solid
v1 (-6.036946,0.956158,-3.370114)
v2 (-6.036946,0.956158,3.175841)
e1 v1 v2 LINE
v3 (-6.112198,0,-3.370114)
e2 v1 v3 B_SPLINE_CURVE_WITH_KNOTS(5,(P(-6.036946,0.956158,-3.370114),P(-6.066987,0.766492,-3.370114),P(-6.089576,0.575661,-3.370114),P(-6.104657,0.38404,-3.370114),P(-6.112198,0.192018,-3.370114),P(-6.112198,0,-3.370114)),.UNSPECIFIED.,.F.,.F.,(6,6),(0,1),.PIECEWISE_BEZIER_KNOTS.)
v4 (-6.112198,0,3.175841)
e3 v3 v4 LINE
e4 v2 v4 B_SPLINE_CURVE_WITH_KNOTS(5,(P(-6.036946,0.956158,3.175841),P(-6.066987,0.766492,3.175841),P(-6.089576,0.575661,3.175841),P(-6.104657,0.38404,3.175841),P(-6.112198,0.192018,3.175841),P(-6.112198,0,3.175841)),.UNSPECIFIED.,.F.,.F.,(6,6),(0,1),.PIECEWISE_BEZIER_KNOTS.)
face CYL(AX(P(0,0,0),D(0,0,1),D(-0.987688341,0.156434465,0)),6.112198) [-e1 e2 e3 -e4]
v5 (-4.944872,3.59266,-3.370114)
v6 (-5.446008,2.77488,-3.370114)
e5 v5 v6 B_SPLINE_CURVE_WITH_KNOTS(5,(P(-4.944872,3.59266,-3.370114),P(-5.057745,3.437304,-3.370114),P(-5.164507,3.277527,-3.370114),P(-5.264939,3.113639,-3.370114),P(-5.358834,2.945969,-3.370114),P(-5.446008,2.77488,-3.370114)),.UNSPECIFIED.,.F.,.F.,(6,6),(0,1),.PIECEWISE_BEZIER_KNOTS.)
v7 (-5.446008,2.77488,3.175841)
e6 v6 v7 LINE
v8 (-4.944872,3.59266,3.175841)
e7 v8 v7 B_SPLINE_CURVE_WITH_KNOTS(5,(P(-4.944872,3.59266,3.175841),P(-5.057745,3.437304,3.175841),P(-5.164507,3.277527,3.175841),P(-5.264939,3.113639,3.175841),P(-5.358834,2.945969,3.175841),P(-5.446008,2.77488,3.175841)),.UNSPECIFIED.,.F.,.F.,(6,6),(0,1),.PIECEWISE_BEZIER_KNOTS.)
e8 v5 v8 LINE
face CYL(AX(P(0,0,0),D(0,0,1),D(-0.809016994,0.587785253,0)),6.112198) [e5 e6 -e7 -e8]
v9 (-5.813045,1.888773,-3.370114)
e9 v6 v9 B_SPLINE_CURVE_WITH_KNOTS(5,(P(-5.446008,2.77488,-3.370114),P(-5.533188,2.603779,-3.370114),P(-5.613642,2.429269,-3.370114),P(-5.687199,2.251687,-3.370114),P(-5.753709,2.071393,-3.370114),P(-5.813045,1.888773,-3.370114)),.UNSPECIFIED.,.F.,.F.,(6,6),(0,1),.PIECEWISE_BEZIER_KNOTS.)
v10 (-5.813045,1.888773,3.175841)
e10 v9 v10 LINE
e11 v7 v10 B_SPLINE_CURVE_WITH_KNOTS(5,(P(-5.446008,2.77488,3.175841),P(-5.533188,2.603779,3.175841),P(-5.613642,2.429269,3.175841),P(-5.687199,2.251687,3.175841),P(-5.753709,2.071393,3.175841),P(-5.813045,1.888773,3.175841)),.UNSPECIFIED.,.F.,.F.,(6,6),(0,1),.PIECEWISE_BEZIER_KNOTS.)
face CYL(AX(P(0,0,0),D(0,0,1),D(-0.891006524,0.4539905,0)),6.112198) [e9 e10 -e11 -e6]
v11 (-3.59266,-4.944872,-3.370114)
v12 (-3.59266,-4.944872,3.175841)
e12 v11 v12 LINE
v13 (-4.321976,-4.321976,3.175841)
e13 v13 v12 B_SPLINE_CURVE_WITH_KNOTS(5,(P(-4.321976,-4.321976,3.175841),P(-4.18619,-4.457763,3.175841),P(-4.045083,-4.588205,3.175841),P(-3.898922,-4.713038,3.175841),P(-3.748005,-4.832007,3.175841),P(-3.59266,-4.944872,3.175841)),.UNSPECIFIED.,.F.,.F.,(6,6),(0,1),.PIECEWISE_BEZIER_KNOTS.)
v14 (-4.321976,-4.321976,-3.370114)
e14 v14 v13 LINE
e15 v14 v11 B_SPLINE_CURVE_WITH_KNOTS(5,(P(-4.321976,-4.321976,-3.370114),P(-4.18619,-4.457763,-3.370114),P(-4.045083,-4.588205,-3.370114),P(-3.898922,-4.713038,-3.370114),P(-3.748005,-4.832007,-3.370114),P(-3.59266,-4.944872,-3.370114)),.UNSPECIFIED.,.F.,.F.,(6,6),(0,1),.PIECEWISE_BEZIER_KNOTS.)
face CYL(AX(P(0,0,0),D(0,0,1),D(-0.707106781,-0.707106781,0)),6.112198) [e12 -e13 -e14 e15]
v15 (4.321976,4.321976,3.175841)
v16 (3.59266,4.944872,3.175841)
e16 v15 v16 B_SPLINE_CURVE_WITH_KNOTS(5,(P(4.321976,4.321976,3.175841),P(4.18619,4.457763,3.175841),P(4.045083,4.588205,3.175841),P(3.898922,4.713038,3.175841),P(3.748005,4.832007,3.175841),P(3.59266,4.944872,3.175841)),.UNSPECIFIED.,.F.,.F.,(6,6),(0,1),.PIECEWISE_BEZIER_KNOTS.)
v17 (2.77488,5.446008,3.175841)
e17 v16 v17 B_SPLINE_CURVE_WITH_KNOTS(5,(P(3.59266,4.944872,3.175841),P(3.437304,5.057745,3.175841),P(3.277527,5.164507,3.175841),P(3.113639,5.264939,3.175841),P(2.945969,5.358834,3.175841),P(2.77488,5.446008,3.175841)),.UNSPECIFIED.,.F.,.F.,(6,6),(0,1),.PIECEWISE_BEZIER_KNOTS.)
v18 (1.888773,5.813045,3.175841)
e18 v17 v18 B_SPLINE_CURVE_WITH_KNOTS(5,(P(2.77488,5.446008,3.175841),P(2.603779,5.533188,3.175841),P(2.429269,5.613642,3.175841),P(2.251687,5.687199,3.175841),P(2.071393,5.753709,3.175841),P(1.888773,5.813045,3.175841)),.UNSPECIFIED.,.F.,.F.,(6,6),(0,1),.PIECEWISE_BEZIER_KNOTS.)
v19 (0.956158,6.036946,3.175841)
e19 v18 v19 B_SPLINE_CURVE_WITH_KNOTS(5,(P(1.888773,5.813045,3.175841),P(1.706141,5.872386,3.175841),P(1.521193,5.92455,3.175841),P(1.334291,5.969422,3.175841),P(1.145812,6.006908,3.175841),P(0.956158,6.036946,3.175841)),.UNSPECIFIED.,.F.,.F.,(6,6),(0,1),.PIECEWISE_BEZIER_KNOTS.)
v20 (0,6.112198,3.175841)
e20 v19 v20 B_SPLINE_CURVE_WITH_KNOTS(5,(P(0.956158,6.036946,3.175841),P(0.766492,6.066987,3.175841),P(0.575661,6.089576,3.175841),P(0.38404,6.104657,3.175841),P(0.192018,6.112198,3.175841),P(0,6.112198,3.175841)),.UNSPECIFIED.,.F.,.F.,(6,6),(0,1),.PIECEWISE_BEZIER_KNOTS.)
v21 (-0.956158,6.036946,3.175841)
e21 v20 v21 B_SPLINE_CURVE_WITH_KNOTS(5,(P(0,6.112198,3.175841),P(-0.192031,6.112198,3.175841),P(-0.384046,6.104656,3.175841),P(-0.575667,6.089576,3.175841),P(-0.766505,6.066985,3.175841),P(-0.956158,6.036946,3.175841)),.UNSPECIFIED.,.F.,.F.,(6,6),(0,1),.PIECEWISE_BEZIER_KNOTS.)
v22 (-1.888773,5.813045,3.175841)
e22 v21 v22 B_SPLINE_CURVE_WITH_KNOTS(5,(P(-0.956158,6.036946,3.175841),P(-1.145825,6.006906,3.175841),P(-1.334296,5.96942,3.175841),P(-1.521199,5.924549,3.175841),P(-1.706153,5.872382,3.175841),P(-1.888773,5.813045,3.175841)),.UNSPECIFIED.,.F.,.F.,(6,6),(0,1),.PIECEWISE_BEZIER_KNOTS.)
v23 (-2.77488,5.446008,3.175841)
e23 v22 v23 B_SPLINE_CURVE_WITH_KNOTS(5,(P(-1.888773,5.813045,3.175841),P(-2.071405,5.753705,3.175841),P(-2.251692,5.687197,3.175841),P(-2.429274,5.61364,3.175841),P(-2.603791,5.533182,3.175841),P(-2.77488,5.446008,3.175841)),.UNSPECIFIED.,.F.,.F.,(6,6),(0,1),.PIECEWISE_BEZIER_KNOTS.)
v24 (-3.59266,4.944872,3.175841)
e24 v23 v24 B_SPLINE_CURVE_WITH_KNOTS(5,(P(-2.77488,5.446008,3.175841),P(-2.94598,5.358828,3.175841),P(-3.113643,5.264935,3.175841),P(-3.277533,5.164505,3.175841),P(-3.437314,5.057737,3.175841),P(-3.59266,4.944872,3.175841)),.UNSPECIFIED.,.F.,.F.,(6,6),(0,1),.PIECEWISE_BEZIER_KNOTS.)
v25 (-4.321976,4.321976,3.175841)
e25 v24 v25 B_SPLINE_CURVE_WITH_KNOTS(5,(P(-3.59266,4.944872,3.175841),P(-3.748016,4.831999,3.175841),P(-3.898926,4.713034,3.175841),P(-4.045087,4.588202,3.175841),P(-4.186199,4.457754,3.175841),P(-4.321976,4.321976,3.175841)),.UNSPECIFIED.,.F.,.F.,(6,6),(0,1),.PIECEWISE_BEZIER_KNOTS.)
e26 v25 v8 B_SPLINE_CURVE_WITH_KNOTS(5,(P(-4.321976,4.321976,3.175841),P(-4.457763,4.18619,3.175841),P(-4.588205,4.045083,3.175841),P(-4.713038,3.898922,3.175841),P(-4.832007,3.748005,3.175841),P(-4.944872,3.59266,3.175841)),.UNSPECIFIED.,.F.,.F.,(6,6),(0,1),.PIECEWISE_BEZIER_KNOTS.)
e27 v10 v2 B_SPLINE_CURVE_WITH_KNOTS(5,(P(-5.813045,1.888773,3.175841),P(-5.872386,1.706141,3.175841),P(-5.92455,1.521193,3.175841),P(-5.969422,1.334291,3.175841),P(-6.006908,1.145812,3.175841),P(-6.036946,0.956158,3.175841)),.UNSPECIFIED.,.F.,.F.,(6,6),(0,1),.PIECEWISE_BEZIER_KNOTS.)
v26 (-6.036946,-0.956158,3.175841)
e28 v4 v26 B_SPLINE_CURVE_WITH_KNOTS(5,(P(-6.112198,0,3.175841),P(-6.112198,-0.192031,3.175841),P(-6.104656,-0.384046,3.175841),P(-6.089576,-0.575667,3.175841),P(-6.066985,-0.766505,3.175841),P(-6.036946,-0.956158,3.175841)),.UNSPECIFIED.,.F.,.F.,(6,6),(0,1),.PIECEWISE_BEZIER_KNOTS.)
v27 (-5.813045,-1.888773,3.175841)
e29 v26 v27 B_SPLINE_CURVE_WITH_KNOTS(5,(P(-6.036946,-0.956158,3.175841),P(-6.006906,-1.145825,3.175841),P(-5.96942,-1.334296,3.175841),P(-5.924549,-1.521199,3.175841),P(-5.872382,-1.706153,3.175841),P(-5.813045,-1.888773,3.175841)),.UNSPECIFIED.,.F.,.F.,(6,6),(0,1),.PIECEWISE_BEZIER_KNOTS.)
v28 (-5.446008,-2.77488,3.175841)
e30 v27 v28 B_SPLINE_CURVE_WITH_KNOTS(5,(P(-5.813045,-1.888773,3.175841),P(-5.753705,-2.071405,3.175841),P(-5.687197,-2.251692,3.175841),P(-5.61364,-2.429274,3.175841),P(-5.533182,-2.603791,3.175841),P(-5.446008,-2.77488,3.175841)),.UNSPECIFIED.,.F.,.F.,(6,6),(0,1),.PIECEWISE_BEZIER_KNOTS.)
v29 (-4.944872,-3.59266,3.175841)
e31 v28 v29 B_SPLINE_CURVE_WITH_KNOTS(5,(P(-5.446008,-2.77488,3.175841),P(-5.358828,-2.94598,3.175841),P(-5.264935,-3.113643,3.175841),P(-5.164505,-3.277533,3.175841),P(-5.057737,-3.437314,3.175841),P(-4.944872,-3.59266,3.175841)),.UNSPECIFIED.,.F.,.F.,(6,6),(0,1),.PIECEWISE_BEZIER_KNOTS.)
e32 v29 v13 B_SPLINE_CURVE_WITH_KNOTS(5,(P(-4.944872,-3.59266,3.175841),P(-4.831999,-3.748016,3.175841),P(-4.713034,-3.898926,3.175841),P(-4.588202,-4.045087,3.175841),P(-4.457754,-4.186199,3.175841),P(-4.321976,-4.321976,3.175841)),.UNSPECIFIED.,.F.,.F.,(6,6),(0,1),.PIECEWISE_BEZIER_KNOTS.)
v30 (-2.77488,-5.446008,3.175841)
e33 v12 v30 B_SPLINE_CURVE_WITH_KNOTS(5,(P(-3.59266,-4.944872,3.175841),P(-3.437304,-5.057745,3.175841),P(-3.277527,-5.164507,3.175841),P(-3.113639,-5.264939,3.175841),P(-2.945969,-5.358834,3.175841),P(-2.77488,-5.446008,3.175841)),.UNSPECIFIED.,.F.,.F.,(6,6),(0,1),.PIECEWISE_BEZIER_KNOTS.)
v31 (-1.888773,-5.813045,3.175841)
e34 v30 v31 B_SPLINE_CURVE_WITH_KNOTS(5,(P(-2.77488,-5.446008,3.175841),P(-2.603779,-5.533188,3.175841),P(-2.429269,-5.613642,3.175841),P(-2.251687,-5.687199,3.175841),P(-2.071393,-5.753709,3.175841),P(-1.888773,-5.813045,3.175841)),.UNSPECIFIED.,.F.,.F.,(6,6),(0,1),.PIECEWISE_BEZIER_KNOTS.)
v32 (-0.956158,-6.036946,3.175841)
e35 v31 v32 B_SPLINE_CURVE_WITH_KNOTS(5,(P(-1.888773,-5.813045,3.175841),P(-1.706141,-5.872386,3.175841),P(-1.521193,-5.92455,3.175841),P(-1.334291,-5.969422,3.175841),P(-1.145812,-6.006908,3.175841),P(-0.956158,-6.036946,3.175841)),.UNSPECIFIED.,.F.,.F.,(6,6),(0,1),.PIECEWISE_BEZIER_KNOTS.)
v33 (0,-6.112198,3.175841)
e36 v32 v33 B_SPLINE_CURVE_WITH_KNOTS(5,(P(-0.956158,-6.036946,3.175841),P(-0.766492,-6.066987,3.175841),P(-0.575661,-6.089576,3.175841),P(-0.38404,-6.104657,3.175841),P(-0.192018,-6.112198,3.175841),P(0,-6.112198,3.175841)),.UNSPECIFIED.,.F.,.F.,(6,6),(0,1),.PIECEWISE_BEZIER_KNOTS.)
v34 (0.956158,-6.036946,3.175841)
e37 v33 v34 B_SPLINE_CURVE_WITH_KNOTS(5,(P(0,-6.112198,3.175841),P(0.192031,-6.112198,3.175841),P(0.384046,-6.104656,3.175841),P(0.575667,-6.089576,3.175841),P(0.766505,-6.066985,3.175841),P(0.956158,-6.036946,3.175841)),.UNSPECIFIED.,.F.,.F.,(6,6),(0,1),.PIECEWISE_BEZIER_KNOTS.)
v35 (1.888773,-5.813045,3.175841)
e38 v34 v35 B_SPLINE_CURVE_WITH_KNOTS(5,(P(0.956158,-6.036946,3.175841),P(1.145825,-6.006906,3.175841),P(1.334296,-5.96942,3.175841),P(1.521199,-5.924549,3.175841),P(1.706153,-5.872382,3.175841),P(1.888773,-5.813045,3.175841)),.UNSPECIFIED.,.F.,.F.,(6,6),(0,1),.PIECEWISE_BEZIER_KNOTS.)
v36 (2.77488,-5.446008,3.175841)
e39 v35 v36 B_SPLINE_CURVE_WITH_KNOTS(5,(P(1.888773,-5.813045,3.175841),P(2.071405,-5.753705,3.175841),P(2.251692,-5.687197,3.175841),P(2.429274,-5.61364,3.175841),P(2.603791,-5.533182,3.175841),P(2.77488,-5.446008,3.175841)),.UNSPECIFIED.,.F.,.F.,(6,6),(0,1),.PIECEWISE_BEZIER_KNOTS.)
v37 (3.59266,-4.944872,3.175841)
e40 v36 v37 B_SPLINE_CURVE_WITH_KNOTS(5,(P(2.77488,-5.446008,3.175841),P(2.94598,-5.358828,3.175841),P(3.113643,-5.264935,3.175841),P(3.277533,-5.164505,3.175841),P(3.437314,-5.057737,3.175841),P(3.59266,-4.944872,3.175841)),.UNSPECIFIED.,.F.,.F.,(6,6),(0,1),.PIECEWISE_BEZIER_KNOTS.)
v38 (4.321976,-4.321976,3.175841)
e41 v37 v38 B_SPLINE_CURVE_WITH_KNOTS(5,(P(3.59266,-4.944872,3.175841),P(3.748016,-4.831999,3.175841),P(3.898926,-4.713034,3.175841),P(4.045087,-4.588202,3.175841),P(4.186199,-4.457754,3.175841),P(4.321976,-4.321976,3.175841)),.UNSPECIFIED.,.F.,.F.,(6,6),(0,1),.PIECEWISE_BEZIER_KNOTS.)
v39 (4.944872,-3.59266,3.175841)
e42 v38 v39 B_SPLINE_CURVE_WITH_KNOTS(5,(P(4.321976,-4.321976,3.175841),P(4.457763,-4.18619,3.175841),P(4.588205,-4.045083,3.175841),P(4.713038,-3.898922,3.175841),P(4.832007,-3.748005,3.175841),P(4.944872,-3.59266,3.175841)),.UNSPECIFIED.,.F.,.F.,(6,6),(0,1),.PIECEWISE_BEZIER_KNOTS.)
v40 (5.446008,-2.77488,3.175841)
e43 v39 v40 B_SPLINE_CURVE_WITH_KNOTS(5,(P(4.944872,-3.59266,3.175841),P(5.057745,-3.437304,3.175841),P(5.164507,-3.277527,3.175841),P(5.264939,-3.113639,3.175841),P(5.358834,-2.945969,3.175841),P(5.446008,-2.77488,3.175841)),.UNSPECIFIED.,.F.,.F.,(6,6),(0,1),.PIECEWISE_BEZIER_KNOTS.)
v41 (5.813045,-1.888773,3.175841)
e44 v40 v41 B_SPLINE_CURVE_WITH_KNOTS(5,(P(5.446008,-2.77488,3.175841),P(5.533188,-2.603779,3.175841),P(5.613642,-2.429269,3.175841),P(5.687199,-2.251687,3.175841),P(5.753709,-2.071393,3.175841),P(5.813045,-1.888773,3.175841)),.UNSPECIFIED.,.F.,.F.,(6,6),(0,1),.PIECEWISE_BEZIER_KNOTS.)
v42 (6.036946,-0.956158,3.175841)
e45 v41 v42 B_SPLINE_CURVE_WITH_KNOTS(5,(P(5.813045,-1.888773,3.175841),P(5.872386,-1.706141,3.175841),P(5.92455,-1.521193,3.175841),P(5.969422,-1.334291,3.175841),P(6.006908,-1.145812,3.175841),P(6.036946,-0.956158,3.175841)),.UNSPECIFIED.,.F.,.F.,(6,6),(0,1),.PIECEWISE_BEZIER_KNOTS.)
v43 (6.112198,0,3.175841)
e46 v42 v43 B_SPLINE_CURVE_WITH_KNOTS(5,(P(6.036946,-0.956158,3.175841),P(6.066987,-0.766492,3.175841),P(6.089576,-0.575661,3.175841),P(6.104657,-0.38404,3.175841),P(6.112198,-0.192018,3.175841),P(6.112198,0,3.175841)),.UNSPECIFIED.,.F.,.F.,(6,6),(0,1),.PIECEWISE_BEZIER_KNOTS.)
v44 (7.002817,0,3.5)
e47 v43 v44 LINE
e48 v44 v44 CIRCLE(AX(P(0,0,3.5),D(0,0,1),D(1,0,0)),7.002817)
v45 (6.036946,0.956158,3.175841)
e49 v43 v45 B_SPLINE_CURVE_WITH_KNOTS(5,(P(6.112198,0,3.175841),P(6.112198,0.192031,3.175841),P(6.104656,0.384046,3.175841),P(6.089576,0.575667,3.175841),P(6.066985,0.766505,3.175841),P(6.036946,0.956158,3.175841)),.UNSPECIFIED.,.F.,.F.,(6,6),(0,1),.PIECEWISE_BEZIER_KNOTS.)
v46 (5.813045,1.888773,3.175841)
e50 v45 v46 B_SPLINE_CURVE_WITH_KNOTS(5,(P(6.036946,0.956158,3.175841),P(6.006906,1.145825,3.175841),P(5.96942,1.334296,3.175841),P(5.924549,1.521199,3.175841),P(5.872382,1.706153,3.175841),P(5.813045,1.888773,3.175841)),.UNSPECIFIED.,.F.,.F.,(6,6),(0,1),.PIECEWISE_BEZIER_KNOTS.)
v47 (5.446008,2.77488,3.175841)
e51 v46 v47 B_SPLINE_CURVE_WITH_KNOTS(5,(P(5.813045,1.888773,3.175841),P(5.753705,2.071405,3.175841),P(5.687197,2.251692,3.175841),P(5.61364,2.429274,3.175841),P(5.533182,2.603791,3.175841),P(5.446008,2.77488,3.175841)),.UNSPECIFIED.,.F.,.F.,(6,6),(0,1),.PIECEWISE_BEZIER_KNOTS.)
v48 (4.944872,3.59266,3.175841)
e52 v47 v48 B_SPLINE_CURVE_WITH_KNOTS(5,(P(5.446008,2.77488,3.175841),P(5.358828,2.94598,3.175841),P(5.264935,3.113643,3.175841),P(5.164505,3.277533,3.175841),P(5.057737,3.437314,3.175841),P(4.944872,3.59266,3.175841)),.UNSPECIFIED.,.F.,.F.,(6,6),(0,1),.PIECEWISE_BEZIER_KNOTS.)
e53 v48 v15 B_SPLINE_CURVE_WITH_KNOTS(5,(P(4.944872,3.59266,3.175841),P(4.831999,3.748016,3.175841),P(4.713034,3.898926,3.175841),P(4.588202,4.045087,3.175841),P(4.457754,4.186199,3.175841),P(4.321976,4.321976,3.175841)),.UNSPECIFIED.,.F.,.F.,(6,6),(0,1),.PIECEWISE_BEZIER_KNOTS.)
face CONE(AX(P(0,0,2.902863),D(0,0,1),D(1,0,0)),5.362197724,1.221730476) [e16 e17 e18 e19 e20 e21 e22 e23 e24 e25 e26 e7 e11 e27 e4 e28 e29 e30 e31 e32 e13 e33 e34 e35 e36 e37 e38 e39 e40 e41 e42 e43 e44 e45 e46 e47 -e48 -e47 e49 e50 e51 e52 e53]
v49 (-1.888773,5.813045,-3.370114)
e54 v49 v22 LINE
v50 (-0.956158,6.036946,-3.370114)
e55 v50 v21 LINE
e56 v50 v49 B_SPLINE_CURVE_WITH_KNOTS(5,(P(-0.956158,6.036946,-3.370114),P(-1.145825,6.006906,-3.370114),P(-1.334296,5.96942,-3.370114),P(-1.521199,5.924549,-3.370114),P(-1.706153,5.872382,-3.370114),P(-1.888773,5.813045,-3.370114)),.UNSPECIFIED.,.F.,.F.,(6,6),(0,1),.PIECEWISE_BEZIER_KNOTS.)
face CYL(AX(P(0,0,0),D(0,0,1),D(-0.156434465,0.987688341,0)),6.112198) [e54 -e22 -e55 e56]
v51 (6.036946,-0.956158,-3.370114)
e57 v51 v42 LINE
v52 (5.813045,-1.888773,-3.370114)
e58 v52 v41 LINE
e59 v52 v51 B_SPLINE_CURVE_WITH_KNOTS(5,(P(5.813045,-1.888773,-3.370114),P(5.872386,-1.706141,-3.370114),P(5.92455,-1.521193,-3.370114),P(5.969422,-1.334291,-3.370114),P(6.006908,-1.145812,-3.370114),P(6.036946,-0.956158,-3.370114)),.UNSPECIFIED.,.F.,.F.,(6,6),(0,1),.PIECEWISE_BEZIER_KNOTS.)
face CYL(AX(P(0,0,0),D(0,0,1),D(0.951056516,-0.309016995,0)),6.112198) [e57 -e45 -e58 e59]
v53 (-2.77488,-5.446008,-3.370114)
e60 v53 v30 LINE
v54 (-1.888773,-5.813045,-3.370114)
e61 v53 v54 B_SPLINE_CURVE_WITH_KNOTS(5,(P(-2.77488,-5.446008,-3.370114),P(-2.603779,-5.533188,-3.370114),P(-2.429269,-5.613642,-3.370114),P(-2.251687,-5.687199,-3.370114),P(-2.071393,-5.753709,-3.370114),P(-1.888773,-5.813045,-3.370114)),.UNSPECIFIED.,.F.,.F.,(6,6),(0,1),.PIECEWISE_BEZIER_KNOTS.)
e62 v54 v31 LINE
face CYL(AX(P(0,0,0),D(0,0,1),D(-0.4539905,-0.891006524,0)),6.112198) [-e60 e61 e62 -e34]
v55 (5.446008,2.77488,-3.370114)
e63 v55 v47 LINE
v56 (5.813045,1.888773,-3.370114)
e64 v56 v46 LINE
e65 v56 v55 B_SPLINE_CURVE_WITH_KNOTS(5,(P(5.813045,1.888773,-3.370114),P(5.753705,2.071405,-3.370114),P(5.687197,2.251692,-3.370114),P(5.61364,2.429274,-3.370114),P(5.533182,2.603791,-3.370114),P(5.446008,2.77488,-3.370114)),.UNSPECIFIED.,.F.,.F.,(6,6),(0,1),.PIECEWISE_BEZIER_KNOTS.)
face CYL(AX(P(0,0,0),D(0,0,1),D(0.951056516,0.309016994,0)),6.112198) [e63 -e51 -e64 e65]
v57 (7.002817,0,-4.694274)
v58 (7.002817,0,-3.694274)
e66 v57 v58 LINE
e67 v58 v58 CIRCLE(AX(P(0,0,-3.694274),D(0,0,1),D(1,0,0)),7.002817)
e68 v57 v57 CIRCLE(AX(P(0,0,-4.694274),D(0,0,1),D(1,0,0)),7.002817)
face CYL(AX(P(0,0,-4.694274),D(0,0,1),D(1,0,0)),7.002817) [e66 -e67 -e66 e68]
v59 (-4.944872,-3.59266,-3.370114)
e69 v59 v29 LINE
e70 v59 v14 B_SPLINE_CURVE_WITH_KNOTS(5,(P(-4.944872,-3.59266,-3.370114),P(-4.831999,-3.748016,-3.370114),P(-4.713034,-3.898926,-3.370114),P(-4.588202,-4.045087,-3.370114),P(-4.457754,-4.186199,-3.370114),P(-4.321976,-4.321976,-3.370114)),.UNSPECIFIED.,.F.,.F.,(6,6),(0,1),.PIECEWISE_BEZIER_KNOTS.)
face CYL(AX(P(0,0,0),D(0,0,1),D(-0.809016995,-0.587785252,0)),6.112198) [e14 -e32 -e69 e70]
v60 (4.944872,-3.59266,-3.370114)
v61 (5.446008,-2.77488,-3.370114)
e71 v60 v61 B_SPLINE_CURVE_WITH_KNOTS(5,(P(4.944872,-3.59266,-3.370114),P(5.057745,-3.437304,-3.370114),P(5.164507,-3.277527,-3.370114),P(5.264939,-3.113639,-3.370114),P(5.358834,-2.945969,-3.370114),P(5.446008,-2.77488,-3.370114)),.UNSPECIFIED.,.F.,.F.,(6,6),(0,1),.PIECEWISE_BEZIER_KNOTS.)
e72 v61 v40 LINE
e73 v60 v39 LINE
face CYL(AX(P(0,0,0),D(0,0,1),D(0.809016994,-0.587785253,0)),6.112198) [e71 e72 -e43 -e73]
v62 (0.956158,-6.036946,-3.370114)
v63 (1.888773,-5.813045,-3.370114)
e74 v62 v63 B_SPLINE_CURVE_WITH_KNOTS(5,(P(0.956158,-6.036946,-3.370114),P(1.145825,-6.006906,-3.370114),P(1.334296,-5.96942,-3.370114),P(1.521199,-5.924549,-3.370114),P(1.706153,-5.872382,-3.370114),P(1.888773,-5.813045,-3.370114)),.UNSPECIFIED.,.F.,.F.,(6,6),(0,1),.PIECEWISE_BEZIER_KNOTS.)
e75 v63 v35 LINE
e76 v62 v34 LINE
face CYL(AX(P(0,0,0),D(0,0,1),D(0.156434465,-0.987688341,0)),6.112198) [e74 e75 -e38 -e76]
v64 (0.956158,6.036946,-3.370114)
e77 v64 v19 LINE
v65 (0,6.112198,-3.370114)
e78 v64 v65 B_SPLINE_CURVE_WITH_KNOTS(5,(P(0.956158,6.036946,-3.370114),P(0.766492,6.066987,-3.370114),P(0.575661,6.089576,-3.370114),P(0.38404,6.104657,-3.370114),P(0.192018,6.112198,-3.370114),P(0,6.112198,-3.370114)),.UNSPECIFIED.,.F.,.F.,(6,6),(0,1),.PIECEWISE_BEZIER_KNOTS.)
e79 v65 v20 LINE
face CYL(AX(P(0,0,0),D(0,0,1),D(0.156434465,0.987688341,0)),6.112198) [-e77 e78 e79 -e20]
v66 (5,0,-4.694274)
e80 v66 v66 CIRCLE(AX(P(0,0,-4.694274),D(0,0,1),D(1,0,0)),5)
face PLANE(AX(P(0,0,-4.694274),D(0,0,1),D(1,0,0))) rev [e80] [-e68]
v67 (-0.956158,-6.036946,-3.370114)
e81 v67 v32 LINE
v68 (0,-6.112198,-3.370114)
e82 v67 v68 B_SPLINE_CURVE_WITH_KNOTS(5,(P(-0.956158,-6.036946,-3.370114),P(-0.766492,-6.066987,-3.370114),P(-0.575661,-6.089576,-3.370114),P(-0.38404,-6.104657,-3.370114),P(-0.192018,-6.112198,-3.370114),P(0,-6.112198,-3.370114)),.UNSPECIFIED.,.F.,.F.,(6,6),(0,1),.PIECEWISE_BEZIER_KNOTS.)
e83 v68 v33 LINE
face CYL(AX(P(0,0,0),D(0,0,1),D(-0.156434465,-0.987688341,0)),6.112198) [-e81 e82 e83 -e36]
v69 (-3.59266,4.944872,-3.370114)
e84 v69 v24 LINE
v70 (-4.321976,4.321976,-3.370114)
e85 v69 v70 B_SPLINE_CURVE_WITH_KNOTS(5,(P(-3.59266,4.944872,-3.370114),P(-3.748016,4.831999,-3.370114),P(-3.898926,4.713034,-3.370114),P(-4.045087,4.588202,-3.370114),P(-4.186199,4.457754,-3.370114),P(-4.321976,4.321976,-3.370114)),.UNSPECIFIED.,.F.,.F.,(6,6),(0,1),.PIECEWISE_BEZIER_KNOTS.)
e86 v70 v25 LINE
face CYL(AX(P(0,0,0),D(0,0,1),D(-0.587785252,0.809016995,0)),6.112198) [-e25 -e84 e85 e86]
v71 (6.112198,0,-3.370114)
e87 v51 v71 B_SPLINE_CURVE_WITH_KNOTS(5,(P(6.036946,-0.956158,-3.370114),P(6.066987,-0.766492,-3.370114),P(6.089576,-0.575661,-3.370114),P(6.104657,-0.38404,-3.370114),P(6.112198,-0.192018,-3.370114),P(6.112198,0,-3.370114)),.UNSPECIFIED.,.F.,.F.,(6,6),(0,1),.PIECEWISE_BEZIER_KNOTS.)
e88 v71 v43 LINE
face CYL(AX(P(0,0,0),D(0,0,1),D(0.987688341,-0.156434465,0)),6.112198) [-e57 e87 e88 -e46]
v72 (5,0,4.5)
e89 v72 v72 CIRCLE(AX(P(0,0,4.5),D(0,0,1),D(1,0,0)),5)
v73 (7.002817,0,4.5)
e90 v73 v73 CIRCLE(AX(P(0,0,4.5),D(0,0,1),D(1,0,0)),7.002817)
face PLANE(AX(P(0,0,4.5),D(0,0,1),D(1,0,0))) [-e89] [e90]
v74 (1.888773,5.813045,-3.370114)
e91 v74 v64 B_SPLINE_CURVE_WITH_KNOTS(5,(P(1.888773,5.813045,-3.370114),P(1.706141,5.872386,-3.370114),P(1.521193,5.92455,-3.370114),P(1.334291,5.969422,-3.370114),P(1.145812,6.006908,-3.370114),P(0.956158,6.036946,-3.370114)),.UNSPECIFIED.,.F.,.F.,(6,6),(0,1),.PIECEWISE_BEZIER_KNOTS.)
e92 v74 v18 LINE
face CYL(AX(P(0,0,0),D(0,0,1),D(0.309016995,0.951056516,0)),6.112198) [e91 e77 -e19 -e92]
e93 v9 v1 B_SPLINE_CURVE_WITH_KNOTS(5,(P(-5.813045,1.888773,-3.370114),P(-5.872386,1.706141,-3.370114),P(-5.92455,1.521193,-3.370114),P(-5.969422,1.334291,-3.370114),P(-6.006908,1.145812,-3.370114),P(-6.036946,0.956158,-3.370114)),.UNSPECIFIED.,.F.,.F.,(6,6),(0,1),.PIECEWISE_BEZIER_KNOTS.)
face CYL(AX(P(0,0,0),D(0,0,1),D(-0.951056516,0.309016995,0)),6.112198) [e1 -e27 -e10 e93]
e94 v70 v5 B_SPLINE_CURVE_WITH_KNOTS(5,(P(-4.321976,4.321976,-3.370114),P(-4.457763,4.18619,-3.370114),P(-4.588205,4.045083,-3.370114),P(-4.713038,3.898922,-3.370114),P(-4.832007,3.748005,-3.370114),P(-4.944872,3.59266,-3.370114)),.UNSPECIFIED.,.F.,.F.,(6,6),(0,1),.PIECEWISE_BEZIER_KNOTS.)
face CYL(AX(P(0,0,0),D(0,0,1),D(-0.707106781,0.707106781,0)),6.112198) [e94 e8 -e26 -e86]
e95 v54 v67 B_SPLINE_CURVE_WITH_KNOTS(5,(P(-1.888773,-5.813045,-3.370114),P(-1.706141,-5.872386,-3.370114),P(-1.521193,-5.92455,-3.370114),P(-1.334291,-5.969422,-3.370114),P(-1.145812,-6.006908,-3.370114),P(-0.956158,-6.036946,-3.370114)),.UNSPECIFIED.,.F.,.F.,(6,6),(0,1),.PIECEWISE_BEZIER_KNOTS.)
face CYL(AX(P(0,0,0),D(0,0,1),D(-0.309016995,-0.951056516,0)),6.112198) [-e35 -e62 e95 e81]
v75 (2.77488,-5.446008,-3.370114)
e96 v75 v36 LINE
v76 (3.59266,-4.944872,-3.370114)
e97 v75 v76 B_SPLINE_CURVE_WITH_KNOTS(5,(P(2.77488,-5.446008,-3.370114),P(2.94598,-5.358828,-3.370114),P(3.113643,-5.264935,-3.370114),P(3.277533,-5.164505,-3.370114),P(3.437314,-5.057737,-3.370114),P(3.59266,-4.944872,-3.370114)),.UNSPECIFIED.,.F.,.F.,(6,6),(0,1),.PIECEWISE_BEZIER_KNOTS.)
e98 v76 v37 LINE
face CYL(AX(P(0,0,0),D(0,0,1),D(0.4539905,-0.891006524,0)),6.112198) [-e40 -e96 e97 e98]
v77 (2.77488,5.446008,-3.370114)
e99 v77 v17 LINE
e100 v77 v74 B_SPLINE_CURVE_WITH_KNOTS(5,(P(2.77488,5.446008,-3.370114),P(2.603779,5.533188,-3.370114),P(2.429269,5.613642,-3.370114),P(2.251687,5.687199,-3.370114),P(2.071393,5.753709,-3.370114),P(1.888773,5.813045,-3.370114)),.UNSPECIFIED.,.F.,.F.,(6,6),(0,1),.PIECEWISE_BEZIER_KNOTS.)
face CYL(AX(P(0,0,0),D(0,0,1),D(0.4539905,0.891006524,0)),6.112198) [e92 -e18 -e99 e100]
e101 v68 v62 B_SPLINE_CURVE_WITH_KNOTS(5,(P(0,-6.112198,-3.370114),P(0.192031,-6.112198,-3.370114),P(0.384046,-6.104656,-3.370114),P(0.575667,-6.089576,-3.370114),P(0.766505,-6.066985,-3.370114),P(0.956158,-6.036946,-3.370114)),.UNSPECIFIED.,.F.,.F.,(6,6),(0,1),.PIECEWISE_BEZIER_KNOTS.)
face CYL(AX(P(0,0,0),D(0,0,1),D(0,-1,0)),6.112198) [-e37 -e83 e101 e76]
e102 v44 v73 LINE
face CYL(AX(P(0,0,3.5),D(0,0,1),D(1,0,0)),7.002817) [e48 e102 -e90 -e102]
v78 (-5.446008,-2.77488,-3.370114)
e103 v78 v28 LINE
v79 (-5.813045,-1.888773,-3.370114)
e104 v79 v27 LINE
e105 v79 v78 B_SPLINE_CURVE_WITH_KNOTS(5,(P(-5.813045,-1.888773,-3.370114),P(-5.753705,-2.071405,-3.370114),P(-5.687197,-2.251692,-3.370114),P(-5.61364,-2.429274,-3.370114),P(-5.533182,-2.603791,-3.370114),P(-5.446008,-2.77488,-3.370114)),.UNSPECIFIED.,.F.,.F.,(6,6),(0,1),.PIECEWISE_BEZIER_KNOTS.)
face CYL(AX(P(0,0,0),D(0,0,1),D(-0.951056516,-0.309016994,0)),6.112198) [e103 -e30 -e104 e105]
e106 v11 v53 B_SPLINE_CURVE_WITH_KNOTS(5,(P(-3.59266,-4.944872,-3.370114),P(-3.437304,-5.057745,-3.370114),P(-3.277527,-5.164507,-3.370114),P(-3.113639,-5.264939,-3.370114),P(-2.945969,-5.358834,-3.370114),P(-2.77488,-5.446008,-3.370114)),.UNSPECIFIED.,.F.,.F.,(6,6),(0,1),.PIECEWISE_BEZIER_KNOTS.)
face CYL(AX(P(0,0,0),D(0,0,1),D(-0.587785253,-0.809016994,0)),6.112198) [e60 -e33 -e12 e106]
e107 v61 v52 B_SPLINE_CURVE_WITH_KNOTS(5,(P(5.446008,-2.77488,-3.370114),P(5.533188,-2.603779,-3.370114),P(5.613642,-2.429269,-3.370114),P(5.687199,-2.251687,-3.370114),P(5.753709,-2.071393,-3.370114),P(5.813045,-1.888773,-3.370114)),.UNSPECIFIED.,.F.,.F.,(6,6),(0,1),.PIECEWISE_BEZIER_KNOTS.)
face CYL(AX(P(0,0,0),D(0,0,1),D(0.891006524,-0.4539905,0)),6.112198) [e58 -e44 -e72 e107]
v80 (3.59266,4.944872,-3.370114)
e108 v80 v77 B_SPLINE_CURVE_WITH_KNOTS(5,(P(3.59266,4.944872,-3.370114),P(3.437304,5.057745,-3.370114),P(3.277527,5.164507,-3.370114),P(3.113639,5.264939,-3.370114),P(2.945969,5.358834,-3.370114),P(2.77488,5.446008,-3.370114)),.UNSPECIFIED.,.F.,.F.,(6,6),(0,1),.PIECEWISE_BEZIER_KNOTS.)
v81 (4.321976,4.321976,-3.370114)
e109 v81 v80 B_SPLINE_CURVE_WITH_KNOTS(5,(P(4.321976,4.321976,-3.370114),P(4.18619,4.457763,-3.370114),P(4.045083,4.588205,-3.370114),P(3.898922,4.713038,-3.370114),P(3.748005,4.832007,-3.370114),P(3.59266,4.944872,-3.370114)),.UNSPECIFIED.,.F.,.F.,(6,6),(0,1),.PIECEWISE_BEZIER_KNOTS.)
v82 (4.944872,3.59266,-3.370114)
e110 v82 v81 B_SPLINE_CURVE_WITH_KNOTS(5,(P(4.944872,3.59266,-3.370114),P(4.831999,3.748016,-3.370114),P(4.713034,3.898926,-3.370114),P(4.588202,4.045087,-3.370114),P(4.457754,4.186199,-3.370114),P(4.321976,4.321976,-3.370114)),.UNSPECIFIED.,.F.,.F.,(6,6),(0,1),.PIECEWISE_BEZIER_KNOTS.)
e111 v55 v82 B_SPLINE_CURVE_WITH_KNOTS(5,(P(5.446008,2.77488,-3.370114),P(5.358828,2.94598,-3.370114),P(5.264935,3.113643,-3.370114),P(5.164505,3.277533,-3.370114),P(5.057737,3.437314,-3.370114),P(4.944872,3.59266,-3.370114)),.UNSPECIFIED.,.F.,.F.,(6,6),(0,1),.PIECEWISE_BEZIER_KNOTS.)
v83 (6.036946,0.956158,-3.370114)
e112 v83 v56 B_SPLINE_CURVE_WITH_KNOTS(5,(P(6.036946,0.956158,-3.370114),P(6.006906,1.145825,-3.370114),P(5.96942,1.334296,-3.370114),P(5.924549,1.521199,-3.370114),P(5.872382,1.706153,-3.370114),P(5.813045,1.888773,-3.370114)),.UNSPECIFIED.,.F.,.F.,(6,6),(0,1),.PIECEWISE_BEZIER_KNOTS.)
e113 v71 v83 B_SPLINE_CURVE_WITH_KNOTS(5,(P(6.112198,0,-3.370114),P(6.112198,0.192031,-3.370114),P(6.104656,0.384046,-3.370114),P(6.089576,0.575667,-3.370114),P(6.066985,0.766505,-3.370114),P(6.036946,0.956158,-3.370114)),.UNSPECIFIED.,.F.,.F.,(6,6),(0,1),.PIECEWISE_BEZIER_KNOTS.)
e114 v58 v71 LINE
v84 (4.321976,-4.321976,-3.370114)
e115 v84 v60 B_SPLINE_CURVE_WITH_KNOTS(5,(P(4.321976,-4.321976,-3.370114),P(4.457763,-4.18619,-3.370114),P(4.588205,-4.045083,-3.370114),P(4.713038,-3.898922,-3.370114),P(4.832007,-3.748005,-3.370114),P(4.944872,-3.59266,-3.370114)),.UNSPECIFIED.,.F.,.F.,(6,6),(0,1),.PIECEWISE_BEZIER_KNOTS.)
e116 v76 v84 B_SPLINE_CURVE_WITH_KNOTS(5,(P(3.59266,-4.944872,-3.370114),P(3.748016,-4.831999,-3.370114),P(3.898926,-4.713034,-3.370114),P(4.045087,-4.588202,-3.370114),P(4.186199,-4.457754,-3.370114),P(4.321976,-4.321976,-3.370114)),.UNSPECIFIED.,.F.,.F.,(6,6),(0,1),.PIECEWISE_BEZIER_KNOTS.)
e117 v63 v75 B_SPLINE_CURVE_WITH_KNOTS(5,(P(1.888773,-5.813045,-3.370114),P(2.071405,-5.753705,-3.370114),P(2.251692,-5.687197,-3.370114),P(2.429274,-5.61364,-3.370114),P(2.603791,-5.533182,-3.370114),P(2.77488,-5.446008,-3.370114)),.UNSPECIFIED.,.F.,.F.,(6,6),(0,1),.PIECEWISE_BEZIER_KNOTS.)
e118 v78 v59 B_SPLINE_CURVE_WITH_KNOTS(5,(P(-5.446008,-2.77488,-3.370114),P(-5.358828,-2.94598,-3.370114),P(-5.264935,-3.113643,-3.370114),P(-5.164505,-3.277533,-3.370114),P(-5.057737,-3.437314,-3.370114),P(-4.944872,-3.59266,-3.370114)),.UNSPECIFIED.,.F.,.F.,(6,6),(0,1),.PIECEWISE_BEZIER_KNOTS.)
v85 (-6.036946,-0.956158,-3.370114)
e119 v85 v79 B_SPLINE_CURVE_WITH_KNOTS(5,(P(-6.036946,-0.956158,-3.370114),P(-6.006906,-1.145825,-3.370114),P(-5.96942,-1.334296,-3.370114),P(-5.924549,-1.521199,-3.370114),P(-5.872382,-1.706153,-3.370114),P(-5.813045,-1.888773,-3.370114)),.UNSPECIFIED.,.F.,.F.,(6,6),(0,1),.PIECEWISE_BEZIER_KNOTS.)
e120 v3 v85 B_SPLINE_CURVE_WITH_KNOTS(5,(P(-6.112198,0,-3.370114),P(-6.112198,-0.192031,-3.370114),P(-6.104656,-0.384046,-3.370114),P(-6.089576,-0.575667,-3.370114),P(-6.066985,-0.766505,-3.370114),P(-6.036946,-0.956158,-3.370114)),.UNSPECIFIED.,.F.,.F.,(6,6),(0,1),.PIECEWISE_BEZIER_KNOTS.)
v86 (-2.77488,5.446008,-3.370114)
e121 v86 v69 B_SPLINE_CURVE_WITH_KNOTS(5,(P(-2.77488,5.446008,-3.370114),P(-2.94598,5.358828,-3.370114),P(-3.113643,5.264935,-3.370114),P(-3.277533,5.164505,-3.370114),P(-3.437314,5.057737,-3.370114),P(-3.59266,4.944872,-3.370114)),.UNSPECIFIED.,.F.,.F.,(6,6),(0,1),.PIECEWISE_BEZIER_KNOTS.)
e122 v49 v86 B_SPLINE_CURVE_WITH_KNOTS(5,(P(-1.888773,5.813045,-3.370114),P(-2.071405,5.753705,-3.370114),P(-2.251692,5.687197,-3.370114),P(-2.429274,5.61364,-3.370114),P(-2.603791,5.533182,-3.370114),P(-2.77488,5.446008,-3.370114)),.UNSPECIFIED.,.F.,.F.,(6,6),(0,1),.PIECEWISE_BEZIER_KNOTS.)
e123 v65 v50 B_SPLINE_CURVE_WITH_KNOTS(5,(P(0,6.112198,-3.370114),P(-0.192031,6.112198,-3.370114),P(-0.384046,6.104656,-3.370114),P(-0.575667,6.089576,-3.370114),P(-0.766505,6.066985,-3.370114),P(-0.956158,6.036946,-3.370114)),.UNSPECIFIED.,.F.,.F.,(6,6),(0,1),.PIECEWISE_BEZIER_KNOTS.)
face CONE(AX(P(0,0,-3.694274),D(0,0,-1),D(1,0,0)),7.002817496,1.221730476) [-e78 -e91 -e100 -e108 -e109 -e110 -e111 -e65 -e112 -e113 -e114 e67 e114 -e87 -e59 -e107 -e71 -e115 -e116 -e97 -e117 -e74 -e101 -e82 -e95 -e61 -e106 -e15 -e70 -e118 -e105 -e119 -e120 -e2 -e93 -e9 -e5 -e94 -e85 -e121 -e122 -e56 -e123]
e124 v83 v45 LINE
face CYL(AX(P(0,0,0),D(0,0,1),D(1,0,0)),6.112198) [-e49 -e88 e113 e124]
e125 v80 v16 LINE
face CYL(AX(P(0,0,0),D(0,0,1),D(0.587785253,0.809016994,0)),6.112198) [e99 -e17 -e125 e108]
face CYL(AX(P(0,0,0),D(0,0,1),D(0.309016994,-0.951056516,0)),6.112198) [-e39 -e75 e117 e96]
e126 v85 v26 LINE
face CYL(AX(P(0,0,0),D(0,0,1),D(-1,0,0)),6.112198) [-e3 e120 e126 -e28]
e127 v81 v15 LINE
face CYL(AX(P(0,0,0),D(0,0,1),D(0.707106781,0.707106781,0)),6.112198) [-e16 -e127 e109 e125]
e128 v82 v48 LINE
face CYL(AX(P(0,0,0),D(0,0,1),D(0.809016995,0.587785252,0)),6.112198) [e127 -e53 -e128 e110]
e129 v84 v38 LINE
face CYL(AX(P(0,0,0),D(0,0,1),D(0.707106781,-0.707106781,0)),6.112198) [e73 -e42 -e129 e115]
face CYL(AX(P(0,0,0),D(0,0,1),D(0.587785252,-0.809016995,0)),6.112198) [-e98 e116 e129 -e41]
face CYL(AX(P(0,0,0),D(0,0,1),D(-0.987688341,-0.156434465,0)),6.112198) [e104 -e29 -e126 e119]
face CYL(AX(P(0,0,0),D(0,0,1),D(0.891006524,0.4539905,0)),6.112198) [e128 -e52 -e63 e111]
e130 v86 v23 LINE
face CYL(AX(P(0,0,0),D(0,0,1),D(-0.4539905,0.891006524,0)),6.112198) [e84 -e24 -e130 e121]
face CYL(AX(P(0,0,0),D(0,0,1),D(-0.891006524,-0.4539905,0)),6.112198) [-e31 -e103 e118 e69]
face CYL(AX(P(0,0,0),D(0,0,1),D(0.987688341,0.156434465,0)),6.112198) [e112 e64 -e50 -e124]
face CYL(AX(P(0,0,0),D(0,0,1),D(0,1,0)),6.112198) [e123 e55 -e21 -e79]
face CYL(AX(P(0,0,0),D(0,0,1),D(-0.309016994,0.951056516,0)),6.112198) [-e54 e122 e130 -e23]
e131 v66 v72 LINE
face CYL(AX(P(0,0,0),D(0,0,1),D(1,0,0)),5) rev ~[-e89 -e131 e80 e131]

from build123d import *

# Parameters (mm, degrees)
F3_DEPTH = 4.5
F4_COUNT = 20
F7_R     = 5
F8_DEPTH = 50


# Not quite as in the source:
# - a feature names something its author has since deleted; it is built from what else it names


with BuildPart() as f3:
    # F2 (on Top) → F3 (new body, symmetric)
    with BuildSketch(Plane.XY):
        with BuildLine():
            Line((0.8388325323, 5.2961801716), (0.9561583811, 6.0369464271))
            ThreePointArc((0.9561583811, 6.0369464271), (0.4795575063, 6.0933558579), (0, 6.1121977237))
            ThreePointArc((0, 6.1121977237), (-0.2034624056, 6.108810364), (-0.4066992948, 6.0986520393))
            ThreePointArc((-0.4066992948, 6.0986520393), (-0.682126936, 6.074015464), (-0.9561583811, 6.0369464271))
            Line((-0.9561583811, 6.0369464271), (-0.8388325323, 5.2961801716))
            Line((-0.8388325323, 5.2961801716), (0, 0))
            Line((0, 0), (0.8388325323, 5.2961801716))
        make_face()
    extrude(amount=F3_DEPTH, both=True)

    # F4: F3 ×20 about axis
    f4_axis = Axis((0, 0, 0), (0, 0, -1))


with BuildPart() as f3_1:
    add(f3.part)
    for i in range(1, F4_COUNT):
        add(f3.part.rotate(f4_axis, i * 360 / F4_COUNT))

    # F5 (on Front) → F6 (revolve)
    with BuildSketch(Plane.XZ):
        Polygon((7.002817496, 4.5), (0, 4.5), (0, 2.9028632371), (5.3621977237, 2.9028632371), (7.002817496, 3.5), align=None)
        Polygon((5.3621977237, -3.0971367629), (0, -3.0971367629), (0, -4.6942735258), (7.002817496, -4.6942735258), (7.002817496, -3.6942735258), align=None)
    revolve(axis=Axis((0, 0, 3.7014316186), (0, 0, 1)))

    # F7 (on Top) → F8 (cut, symmetric)
    with BuildSketch(Plane.XY):
        Circle(F7_R)
    extrude(amount=F8_DEPTH, both=True, mode=Mode.SUBTRACT)


solid = f3_1.part
